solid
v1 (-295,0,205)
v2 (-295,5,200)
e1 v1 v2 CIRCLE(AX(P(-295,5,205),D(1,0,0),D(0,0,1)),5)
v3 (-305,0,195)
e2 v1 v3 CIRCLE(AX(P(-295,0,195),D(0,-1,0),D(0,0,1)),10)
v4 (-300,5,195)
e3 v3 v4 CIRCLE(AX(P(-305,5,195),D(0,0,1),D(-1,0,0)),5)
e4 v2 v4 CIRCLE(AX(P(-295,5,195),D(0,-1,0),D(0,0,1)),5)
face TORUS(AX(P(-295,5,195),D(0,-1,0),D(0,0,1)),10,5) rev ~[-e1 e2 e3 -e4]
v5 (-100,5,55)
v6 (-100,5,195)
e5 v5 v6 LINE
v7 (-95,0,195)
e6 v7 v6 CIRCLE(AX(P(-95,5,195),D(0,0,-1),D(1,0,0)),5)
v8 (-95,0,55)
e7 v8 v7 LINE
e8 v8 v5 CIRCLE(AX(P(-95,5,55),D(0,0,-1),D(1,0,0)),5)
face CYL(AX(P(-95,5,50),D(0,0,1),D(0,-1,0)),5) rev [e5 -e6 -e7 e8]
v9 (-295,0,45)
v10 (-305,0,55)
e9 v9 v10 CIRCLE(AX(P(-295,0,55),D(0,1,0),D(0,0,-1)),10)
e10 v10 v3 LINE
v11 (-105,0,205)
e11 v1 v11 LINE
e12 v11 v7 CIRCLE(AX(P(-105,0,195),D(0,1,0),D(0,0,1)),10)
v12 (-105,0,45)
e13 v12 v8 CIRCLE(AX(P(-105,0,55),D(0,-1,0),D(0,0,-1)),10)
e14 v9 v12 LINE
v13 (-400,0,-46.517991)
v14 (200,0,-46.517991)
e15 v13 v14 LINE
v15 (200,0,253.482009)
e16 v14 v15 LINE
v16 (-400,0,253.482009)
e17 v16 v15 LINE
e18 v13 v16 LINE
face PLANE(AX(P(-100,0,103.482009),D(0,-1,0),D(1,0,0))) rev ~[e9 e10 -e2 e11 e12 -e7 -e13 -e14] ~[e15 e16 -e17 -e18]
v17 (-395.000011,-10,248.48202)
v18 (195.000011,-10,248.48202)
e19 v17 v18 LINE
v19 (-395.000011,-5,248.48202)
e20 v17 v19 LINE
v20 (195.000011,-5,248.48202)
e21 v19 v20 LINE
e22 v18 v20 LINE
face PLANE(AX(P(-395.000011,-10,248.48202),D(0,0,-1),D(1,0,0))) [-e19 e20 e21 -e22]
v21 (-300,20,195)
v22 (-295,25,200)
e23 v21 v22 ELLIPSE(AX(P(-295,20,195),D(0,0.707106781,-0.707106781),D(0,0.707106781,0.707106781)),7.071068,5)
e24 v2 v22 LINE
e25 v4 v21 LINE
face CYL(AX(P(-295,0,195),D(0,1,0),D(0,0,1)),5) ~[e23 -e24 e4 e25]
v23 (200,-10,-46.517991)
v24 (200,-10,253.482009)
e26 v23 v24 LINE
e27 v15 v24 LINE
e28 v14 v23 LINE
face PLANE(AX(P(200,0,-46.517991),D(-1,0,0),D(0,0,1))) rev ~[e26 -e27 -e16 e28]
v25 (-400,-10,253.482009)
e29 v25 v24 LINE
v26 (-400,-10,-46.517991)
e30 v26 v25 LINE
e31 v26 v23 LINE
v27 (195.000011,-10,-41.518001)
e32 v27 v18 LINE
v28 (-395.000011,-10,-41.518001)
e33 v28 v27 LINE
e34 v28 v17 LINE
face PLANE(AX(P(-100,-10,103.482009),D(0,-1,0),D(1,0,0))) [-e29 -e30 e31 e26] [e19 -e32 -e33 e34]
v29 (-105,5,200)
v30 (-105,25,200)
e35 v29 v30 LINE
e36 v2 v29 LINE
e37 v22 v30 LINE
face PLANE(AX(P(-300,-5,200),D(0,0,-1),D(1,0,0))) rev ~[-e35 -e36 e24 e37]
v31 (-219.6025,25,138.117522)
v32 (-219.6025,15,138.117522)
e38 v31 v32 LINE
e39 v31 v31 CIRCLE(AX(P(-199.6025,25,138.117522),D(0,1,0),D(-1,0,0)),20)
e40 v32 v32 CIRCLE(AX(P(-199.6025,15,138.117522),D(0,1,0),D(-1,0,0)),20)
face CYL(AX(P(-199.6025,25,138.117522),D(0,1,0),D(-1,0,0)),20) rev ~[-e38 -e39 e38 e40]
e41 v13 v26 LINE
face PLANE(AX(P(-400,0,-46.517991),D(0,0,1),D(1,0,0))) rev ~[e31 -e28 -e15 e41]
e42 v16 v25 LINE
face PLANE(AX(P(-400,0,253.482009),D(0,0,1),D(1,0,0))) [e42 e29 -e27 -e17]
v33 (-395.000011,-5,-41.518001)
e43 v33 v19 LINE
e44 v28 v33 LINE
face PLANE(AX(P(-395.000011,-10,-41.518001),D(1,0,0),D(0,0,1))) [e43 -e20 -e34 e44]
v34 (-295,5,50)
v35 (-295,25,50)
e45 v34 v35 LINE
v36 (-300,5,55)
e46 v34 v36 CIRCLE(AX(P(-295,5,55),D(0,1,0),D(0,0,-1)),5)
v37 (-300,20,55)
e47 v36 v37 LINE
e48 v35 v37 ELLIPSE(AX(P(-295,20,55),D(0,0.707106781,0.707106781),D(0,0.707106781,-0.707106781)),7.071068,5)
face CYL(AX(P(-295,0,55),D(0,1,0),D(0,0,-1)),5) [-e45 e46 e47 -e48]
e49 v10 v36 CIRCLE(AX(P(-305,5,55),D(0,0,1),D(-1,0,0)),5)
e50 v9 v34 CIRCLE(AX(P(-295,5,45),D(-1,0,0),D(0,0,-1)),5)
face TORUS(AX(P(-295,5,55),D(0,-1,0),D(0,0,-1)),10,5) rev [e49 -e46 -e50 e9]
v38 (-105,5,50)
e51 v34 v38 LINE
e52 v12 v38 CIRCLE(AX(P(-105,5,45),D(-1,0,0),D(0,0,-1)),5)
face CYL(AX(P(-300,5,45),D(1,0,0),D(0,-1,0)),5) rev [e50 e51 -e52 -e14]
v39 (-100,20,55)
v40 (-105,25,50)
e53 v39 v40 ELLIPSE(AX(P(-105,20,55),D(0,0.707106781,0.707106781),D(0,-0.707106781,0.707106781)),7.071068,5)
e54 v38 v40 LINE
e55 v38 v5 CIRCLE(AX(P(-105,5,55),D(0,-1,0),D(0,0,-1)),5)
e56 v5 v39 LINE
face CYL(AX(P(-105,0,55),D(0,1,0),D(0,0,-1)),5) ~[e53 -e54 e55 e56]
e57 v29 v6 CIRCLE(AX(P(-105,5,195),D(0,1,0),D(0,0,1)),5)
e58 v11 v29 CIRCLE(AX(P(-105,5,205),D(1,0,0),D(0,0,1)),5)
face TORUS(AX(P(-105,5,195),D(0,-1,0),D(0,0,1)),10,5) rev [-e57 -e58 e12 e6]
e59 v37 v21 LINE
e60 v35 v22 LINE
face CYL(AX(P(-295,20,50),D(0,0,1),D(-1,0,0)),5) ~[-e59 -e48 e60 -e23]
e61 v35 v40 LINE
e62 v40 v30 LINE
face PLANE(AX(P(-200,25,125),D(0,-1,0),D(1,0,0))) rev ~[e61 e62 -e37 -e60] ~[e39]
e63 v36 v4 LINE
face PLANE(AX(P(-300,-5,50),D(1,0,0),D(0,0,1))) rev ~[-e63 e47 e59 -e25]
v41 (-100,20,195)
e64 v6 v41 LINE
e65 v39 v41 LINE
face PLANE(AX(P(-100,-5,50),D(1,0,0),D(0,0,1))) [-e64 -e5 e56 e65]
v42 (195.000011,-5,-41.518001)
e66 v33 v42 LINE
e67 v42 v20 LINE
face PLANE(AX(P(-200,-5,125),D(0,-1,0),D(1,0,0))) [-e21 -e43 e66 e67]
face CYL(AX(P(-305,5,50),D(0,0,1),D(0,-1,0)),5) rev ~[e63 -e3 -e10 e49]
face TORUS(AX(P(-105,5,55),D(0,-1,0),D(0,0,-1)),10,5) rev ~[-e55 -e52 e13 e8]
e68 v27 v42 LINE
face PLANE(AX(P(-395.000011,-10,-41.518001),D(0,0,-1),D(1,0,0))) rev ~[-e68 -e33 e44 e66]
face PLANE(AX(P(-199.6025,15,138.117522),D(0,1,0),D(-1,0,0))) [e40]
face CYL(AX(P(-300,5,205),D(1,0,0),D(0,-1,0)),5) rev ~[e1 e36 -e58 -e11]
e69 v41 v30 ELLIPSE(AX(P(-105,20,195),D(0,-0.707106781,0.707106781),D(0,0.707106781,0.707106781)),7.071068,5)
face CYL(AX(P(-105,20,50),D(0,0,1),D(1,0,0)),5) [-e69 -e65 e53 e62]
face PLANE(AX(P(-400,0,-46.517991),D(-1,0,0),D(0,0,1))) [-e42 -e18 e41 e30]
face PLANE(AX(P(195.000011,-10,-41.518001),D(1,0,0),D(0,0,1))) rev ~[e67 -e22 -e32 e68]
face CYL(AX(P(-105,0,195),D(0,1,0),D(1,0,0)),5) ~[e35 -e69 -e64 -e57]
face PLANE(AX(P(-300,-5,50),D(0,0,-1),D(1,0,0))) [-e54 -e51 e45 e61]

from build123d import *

# Parameters (mm, degrees)
F0_W     = 600
F0_H     = 300
F1_DEPTH = 10
F2_W     = 590.0000214577
F2_H     = 290.0000214577
F3_DEPTH = 5
F4_W     = 200
F4_H     = 150
F5_DEPTH = 30
F6_R     = 5
F7_R     = 20
F8_DEPTH = 10


with BuildPart() as f1:
    # F0 (on Front) → F1 (new body)
    with BuildSketch(Plane.XZ):
        with Locations((-100, 103.4820094705)):
            Rectangle(F0_W, F0_H)
    extrude(amount=F1_DEPTH)

    # F2 (on face) → F3 (cut)
    with BuildSketch(Plane.XZ.offset(10)):
        with Locations((-100, 103.4820094705)):
            Rectangle(F2_W, F2_H)
    extrude(amount=-F3_DEPTH, mode=Mode.SUBTRACT)

    # F4 (on face) → F5 (join)
    with BuildSketch(Plane.XZ.offset(5)):
        with Locations((-200, 125)):
            Rectangle(F4_W, F4_H)
    extrude(amount=-F5_DEPTH)

    # F6
    f6_edges = [f1.edges().sort_by_distance(p)[0] for p in [
        (-100, 0, 125),
        (-100, 12.5, 200),
        (-100, 25, 125),
        (-100, 12.5, 50),
        (-300, 0, 125),
        (-300, 12.5, 50),
        (-300, 25, 125),
        (-300, 12.5, 200),
        (-200, 0, 200),
        (-200, 0, 50),
    ]]
    fillet(f6_edges, radius=F6_R)

    # F7 (on face) → F8 (cut)
    with BuildSketch(Plane(origin=(0, 25, 0), x_dir=(-1, 0, 0), z_dir=(0, 1, 0))):
        with Locations((199.6024996042, 138.1175220013)):
            Circle(F7_R)
    extrude(amount=-F8_DEPTH, mode=Mode.SUBTRACT)


solid = f1.part
